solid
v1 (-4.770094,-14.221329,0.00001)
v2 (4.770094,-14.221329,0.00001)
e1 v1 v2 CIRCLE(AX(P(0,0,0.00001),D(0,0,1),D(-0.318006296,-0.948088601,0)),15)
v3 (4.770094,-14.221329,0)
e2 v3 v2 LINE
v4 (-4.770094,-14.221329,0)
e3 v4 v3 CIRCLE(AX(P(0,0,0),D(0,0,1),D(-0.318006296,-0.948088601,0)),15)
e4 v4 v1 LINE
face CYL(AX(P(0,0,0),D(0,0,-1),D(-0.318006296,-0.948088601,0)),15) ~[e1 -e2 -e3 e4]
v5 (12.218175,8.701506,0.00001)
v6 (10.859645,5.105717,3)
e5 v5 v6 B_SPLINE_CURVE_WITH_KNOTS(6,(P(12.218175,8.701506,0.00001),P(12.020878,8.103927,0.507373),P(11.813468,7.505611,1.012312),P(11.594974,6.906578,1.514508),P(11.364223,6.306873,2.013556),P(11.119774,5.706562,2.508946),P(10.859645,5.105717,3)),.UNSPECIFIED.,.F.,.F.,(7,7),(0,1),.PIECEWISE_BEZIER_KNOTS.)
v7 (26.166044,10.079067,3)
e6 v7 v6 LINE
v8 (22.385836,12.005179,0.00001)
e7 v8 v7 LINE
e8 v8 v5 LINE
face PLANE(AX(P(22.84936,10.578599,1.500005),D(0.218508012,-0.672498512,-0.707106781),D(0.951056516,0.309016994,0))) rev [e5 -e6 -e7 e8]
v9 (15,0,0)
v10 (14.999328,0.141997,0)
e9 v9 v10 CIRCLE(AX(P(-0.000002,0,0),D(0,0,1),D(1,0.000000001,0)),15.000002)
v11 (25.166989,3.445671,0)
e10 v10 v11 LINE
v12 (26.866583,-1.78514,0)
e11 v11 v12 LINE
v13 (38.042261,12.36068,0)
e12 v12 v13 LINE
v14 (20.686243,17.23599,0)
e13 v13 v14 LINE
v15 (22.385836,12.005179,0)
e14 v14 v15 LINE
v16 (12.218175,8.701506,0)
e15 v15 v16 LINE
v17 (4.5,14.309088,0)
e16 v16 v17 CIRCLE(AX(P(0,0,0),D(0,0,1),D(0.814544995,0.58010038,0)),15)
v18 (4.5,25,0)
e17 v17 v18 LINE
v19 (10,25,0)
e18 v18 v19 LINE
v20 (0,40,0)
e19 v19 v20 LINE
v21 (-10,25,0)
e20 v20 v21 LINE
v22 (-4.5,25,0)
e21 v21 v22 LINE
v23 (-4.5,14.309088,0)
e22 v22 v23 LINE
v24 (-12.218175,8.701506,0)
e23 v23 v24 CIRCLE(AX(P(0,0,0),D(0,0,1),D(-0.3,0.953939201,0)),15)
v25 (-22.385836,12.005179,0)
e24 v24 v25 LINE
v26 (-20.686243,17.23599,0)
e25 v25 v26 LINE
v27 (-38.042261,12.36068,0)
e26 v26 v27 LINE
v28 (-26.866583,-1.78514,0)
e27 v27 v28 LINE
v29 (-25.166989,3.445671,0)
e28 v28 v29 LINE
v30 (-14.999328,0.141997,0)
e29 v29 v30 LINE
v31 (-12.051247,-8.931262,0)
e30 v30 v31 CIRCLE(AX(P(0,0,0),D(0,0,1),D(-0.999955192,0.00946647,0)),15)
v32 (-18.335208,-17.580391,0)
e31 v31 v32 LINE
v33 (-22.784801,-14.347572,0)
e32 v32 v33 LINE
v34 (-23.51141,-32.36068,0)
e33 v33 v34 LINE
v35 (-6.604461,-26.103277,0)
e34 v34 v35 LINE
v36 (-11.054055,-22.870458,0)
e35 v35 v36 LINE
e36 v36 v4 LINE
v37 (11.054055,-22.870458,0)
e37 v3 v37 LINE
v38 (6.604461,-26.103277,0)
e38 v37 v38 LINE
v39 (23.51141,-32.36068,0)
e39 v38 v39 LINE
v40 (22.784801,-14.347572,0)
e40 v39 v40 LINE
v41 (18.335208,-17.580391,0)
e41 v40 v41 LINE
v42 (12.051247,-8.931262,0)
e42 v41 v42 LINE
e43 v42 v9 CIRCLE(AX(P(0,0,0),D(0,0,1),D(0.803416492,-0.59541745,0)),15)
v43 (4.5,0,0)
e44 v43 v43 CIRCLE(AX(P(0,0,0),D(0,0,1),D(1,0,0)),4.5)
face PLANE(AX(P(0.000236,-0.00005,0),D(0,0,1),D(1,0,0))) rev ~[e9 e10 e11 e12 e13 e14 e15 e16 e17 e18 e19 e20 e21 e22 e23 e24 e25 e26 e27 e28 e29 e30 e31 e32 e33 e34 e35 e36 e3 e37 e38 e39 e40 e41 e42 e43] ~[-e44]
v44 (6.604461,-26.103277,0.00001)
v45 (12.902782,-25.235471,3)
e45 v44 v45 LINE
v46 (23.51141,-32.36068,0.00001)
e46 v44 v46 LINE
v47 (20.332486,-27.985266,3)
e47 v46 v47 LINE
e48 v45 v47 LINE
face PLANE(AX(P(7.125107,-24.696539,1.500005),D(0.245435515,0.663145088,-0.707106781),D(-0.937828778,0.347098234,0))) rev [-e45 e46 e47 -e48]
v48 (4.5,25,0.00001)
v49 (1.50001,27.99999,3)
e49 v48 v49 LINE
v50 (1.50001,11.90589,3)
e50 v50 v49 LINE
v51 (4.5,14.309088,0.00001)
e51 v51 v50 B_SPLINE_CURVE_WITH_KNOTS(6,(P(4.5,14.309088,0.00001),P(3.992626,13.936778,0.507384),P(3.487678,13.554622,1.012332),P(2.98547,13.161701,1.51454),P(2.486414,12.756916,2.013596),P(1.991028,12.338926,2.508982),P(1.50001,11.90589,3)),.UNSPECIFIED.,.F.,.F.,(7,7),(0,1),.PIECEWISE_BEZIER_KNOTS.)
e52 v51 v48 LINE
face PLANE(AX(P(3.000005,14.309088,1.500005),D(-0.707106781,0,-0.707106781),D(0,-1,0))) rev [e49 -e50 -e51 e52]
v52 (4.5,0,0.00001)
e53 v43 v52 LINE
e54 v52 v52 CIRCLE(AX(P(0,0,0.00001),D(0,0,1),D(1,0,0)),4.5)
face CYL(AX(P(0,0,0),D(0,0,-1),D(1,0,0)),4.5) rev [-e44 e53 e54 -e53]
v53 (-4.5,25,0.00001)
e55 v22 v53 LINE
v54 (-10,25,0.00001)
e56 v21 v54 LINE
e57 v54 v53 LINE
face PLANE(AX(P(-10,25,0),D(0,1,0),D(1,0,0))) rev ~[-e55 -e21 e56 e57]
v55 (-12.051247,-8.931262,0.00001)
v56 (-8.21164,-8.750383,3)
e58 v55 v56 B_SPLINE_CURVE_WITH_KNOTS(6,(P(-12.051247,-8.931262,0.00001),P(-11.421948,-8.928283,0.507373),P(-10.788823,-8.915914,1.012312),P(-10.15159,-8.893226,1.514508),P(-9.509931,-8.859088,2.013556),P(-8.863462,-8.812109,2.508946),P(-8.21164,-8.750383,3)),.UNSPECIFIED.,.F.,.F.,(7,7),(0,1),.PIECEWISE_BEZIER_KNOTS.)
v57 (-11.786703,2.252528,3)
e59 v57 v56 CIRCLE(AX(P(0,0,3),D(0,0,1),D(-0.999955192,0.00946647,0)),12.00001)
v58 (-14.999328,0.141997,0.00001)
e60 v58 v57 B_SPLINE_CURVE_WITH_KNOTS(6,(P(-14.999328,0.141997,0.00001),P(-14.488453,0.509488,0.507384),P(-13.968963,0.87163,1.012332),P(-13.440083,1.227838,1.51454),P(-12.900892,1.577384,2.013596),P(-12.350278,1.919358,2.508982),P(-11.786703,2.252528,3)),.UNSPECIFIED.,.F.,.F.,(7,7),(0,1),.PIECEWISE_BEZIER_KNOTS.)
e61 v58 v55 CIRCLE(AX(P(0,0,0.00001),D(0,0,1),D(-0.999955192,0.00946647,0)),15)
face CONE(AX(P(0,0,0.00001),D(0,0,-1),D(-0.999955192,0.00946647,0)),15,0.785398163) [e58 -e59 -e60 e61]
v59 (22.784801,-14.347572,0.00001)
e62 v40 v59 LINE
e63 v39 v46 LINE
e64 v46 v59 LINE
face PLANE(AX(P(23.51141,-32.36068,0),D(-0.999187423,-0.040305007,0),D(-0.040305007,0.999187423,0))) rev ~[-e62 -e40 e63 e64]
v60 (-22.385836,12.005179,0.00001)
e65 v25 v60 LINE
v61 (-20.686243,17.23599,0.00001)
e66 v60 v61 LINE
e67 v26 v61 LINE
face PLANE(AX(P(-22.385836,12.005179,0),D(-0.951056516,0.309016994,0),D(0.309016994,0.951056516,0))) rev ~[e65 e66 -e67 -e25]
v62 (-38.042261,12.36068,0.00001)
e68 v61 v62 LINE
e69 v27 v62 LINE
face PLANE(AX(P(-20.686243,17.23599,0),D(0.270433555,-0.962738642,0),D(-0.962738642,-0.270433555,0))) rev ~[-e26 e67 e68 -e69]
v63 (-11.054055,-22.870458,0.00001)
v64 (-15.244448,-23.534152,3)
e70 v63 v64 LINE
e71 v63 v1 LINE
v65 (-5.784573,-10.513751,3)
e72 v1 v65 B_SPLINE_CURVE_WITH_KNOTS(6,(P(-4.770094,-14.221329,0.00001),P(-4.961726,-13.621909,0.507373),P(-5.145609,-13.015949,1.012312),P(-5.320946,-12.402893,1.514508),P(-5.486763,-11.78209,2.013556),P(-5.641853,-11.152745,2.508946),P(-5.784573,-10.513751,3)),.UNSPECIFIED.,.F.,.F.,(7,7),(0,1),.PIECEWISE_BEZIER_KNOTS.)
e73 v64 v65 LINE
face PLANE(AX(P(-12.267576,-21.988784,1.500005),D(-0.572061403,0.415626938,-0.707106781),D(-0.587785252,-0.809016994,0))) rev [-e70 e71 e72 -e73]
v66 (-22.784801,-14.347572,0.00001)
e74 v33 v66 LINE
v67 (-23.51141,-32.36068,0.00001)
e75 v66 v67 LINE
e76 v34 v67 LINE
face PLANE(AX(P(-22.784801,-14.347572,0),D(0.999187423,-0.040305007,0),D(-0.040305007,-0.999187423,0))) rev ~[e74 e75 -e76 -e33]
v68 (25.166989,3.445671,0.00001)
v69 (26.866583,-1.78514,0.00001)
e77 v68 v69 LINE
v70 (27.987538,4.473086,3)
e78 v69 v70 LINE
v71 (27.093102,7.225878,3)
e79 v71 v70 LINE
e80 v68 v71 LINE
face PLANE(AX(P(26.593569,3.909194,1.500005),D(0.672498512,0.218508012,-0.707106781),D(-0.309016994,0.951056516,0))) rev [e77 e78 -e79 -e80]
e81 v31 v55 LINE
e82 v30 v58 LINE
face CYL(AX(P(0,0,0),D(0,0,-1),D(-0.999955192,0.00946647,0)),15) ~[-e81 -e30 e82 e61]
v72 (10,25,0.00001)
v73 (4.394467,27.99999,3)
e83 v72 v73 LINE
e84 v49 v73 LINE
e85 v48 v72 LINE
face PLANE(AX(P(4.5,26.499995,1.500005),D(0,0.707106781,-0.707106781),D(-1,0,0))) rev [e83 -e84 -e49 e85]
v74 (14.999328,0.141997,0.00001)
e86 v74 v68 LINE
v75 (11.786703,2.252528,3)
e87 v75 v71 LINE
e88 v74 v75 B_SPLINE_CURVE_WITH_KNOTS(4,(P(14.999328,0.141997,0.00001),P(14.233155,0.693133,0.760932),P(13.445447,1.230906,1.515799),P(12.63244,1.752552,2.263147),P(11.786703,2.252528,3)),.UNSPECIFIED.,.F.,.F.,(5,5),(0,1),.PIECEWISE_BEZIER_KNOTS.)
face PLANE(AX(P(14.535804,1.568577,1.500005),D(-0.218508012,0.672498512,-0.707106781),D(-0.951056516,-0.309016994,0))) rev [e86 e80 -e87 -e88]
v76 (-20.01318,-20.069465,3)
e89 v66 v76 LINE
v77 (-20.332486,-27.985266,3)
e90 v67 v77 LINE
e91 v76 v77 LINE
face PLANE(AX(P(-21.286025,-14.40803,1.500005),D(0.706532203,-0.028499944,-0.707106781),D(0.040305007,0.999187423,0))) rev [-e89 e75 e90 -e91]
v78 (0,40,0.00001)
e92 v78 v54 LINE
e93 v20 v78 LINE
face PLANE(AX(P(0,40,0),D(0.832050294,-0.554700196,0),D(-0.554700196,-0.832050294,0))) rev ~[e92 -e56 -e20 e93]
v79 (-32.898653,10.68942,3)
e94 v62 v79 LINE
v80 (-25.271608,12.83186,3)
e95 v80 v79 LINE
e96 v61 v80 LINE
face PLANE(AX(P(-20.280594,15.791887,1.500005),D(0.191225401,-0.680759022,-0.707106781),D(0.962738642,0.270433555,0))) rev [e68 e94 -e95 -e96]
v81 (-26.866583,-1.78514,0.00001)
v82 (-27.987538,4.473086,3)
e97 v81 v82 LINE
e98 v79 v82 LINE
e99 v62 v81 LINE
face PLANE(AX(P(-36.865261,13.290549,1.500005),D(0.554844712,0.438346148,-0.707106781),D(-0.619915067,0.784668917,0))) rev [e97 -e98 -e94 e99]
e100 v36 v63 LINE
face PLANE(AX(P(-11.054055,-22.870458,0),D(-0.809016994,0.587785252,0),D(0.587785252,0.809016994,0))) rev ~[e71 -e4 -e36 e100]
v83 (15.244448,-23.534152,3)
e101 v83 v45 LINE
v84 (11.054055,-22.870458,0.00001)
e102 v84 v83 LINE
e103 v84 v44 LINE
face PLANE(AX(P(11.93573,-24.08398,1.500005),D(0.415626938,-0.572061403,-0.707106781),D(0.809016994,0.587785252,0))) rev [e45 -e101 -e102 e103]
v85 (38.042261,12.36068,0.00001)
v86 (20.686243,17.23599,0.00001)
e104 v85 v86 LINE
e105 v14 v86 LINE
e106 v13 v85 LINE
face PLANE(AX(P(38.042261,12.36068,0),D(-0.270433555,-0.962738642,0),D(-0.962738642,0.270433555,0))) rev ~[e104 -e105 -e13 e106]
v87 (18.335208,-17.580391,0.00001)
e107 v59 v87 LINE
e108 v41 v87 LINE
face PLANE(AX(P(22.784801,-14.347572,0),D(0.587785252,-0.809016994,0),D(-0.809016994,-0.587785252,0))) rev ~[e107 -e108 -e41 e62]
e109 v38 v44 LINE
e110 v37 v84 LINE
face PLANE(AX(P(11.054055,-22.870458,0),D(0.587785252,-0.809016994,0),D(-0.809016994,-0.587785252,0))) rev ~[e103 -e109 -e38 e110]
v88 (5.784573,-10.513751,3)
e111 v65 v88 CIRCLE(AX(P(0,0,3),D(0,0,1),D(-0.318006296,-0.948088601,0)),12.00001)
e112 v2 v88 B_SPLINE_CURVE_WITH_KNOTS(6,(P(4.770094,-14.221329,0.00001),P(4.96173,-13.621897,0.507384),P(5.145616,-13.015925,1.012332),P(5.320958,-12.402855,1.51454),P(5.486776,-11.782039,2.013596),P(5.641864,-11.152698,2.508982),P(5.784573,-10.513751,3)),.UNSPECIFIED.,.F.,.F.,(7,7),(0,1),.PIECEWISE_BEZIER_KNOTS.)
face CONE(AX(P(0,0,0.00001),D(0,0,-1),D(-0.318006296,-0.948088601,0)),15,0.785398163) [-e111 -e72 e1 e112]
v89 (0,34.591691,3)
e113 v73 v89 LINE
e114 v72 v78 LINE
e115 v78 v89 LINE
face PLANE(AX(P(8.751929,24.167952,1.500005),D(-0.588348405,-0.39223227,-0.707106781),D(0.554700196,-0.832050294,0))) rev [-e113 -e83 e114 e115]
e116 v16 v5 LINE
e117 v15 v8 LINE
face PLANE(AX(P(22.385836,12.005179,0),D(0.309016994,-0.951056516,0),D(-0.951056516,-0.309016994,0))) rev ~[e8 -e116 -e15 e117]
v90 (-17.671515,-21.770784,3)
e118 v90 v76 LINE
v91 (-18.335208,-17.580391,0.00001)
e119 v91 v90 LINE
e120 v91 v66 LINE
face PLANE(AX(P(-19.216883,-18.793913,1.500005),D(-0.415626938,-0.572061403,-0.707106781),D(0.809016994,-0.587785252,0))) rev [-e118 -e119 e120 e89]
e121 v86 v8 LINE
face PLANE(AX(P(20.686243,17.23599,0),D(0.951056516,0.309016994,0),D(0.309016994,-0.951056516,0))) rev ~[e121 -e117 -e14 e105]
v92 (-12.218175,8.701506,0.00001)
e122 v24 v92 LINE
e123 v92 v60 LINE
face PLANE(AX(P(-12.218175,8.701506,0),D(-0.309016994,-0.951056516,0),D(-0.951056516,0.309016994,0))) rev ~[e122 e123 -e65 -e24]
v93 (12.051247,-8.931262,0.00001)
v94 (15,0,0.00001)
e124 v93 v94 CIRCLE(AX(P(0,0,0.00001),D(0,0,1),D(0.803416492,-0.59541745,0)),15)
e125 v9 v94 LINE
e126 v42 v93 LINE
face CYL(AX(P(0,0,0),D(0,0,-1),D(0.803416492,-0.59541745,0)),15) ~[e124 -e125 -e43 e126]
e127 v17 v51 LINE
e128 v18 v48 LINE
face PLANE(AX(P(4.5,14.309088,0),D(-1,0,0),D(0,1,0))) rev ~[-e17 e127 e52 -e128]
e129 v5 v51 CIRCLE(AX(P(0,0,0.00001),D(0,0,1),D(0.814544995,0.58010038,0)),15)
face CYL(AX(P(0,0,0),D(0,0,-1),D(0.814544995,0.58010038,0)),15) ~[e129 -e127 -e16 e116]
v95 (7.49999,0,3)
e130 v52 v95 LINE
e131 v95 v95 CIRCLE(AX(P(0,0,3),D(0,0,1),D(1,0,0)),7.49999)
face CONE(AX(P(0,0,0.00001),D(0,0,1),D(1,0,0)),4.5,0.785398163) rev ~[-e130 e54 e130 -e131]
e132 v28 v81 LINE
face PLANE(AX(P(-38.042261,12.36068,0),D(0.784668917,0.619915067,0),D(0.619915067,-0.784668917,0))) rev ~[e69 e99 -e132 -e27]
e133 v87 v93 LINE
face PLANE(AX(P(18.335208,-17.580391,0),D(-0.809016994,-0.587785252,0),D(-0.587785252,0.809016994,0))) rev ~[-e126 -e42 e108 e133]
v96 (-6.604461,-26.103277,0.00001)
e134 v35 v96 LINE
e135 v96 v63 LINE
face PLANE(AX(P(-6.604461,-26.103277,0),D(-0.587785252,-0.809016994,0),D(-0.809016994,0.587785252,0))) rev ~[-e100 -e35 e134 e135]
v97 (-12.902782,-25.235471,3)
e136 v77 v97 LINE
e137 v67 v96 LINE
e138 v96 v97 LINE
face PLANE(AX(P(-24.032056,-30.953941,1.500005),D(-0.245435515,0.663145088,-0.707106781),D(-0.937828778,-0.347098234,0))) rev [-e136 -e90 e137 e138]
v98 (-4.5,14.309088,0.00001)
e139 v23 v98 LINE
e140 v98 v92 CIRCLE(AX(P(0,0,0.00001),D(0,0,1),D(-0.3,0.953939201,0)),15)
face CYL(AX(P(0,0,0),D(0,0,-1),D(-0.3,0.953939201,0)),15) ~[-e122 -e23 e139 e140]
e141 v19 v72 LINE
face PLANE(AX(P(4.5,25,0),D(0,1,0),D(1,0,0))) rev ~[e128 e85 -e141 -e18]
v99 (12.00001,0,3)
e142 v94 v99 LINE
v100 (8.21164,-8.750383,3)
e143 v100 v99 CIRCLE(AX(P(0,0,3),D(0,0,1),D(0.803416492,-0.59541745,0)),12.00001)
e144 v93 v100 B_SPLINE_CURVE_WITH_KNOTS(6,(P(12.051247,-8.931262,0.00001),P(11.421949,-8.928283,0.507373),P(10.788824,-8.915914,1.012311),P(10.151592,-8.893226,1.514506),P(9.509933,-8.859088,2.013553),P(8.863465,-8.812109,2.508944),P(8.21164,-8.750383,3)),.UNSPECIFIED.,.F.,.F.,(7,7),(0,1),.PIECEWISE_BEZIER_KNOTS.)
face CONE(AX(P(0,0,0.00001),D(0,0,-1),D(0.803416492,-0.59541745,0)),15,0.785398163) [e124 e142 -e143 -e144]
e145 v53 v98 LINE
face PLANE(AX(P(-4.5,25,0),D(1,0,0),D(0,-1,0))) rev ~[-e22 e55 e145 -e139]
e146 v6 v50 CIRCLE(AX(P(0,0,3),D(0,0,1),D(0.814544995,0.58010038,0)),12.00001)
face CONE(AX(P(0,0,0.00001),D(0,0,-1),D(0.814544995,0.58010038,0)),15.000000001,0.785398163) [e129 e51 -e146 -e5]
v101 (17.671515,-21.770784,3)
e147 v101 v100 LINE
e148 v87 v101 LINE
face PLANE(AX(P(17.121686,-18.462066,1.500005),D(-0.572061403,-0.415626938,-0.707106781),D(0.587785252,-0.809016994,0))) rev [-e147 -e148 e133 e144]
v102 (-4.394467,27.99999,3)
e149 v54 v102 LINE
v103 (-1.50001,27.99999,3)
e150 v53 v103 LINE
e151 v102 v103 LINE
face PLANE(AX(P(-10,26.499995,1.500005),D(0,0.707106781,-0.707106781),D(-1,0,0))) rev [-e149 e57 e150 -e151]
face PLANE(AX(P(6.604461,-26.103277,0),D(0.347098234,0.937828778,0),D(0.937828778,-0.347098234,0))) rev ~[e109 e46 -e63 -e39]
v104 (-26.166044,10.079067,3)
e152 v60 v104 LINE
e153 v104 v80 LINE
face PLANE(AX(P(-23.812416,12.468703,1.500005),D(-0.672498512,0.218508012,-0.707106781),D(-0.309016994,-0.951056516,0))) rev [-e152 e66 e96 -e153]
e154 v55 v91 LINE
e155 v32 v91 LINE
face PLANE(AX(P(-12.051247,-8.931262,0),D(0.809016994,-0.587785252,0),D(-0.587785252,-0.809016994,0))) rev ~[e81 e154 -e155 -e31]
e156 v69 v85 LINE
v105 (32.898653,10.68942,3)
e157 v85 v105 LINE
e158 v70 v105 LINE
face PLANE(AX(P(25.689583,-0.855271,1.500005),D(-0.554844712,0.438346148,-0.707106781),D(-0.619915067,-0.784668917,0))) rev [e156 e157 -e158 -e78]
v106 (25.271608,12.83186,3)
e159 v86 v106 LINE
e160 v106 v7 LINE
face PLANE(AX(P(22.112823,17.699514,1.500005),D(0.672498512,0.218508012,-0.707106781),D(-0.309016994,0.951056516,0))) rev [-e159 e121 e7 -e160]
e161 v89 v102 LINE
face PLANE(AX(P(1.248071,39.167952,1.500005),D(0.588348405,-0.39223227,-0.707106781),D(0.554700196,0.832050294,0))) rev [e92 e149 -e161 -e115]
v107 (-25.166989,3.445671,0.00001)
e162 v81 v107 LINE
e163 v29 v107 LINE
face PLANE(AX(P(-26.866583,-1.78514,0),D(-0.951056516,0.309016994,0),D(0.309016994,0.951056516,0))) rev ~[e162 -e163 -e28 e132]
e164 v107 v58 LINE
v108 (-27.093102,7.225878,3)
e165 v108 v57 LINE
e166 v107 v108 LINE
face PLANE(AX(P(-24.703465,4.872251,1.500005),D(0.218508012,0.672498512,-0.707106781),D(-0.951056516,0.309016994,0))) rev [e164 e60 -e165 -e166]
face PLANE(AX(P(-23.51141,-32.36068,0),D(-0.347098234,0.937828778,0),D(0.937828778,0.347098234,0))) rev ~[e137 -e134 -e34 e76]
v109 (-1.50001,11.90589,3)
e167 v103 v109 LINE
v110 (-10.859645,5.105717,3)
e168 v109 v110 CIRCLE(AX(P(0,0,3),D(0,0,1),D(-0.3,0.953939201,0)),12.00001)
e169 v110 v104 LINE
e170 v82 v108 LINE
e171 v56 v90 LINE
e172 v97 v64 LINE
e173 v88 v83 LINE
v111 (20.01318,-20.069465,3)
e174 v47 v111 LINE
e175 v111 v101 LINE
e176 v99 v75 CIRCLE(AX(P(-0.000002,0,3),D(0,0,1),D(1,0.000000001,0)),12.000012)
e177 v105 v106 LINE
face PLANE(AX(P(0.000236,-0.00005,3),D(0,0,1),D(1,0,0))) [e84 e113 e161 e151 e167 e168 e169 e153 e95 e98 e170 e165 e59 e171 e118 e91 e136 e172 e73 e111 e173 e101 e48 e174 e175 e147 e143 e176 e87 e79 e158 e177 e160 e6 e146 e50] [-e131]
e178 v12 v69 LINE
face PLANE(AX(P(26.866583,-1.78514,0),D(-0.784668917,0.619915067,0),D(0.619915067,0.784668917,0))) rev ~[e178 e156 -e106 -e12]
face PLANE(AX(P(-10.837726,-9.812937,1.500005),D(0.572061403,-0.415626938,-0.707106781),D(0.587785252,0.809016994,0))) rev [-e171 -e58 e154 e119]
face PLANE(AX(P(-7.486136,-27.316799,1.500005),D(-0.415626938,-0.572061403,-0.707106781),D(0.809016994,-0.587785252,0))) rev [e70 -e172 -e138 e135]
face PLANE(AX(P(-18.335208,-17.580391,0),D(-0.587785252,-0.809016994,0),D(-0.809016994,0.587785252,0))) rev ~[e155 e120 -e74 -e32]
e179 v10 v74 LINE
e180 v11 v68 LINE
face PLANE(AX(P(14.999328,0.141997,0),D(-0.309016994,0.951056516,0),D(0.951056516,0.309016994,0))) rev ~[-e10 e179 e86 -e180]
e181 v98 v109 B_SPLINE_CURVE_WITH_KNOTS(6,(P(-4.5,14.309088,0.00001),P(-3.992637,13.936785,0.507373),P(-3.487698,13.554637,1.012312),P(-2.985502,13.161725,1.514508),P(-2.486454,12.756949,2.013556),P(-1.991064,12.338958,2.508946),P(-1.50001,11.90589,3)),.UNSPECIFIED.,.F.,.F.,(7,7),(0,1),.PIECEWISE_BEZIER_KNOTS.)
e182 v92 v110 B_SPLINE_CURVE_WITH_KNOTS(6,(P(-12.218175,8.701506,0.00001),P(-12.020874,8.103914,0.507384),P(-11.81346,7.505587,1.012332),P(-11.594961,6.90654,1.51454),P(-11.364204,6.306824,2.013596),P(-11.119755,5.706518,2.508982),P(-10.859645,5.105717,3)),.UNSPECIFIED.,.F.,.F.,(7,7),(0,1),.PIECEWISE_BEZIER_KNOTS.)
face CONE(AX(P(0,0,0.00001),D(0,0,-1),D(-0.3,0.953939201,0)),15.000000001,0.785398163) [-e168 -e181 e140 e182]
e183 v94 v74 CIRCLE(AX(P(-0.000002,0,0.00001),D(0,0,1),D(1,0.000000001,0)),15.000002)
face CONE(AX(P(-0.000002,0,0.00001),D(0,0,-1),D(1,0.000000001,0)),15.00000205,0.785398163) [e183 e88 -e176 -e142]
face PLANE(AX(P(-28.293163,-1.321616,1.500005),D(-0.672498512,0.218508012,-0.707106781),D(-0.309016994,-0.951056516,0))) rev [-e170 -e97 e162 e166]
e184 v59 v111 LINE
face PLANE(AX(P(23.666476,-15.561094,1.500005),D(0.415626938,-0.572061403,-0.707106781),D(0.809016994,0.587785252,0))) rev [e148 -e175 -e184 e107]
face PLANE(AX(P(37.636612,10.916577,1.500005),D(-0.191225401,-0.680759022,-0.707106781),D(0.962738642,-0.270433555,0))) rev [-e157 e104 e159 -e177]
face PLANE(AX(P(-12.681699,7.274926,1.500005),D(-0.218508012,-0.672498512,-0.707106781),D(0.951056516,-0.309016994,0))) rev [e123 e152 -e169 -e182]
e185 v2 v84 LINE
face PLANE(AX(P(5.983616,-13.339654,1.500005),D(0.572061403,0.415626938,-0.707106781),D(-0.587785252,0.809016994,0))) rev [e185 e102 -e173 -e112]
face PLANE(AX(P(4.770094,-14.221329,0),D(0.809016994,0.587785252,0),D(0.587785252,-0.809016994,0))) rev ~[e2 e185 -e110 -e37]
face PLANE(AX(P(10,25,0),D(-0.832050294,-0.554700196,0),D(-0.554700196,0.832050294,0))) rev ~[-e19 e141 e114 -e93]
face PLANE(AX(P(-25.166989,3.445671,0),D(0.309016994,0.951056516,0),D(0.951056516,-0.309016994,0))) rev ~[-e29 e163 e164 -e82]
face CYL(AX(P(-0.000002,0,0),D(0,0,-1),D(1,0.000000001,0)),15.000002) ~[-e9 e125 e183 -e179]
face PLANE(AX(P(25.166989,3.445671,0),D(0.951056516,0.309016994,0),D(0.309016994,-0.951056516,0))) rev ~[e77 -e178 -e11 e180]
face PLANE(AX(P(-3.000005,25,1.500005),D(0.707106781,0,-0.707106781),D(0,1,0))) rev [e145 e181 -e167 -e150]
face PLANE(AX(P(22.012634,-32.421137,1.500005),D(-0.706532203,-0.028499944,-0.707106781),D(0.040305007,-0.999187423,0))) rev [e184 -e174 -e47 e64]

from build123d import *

# Parameters (mm, degrees)
F0_R     = 4.5
F1_DEPTH = 3
F2_SIZE2 = 2.99999
F2_SIZE  = 2.99999


# Not quite as in the source:
# - a fillet or chamfer is up to 0.001 mm smaller than in the source, because OpenCascade refuses the exact size


with BuildPart() as f1:
    # F0 (on Top) → F1 (new body)
    with BuildSketch(Plane.XY):
        with BuildLine():
            ThreePointArc((12.0512473873, -8.9312617479), (14.2437479409, -4.7027273571), (15, 0))
            ThreePointArc((15, 0), (14.9998319689, 0.07099932), (14.9993278795, 0.1419970492))
            Line((14.9993278795, 0.1419970492), (9.794719653, -1.5490826747))
            Line((9.794719653, -1.5490826747), (7.0135667036, 7.0104259719))
            Line((7.0135667036, 7.0104259719), (12.2181749302, 8.7015056959))
            ThreePointArc((12.2181749302, 8.7015056959), (8.8167787844, 12.1352549156), (4.5, 14.3090880213))
            Line((4.5, 14.3090880213), (4.5, 8.8366390791))
            Line((4.5, 8.8366390791), (-4.5, 8.8366390791))
            Line((-4.5, 8.8366390791), (-4.5, 14.3090880213))
            ThreePointArc((-4.5, 14.3090880213), (-8.8167787844, 12.1352549156), (-12.2181749302, 8.7015056959))
            Line((-12.2181749302, 8.7015056959), (-7.0135667036, 7.0104259719))
            Line((-7.0135667036, 7.0104259719), (-9.794719653, -1.5490826747))
            Line((-9.794719653, -1.5490826747), (-14.9993278795, 0.1419970492))
            ThreePointArc((-14.9993278795, 0.1419970492), (-14.2658477444, -4.6352549156), (-12.0512473873, -8.9312617479))
            Line((-12.0512473873, -8.9312617479), (-8.8346226052, -4.5039575528))
            Line((-8.8346226052, -4.5039575528), (-1.5534696558, -9.7940248235))
            Line((-1.5534696558, -9.7940248235), (-4.770094438, -14.2213290185))
            ThreePointArc((-4.770094438, -14.2213290185), (0, -15), (4.770094438, -14.2213290185))
            Line((4.770094438, -14.2213290185), (1.5534696558, -9.7940248235))
            Line((1.5534696558, -9.7940248235), (8.8346226052, -4.5039575528))
            Line((8.8346226052, -4.5039575528), (12.0512473873, -8.9312617479))
        make_face()
        Circle(F0_R, mode=Mode.SUBTRACT)
        with BuildLine():
            Line((9.794719653, -1.5490826747), (14.9993278795, 0.1419970492))
            ThreePointArc((14.9993278795, 0.1419970492), (14.2658477444, 4.6352549156), (12.2181749302, 8.7015056959))
            Line((12.2181749302, 8.7015056959), (7.0135667036, 7.0104259719))
            Line((7.0135667036, 7.0104259719), (9.794719653, -1.5490826747))
        make_face()
        with BuildLine():
            ThreePointArc((12.2181749302, 8.7015056959), (14.2658477444, 4.6352549156), (14.9993278795, 0.1419970492))
            Line((14.9993278795, 0.1419970492), (25.1669893821, 3.445670536))
            Line((25.1669893821, 3.445670536), (22.3858364327, 12.0051791827))
            Line((22.3858364327, 12.0051791827), (12.2181749302, 8.7015056959))
        make_face()
        with BuildLine():
            Line((18.335207782, -17.5803912241), (12.0512473873, -8.9312617479))
            ThreePointArc((12.0512473873, -8.9312617479), (8.8167787844, -12.1352549156), (4.770094438, -14.2213290185))
            Line((4.770094438, -14.2213290185), (11.0540548326, -22.8704584947))
            Line((11.0540548326, -22.8704584947), (18.335207782, -17.5803912241))
        make_face()
        with BuildLine():
            ThreePointArc((4.770094438, -14.2213290185), (8.8167787844, -12.1352549156), (12.0512473873, -8.9312617479))
            Line((12.0512473873, -8.9312617479), (8.8346226052, -4.5039575528))
            Line((8.8346226052, -4.5039575528), (1.5534696558, -9.7940248235))
            Line((1.5534696558, -9.7940248235), (4.770094438, -14.2213290185))
        make_face()
        Polygon((22.3858364327, 12.0051791827), (25.1669893821, 3.445670536), (26.8665828511, -1.7851403036), (38.0422606518, 12.360679775), (20.6862429636, 17.2359900223), align=None)
        Polygon((22.7848012511, -14.3475723364), (18.335207782, -17.5803912241), (11.0540548326, -22.8704584947), (6.6044613636, -26.1032773823), (23.5114100917, -32.360679775), align=None)
        with BuildLine():
            Line((4.5, 8.8366390791), (4.5, 14.3090880213))
            ThreePointArc((4.5, 14.3090880213), (0, 15), (-4.5, 14.3090880213))
            Line((-4.5, 14.3090880213), (-4.5, 8.8366390791))
            Line((-4.5, 8.8366390791), (4.5, 8.8366390791))
        make_face()
        with BuildLine():
            ThreePointArc((-4.5, 14.3090880213), (0, 15), (4.5, 14.3090880213))
            Line((4.5, 14.3090880213), (4.5, 25))
            Line((4.5, 25), (-4.5, 25))
            Line((-4.5, 25), (-4.5, 14.3090880213))
        make_face()
        with BuildLine():
            Line((-11.0540548326, -22.8704584947), (-4.770094438, -14.2213290185))
            ThreePointArc((-4.770094438, -14.2213290185), (-8.8167787844, -12.1352549156), (-12.0512473873, -8.9312617479))
            Line((-12.0512473873, -8.9312617479), (-18.335207782, -17.5803912241))
            Line((-18.335207782, -17.5803912241), (-11.0540548326, -22.8704584947))
        make_face()
        with BuildLine():
            ThreePointArc((-12.0512473873, -8.9312617479), (-8.8167787844, -12.1352549156), (-4.770094438, -14.2213290185))
            Line((-4.770094438, -14.2213290185), (-1.5534696558, -9.7940248235))
            Line((-1.5534696558, -9.7940248235), (-8.8346226052, -4.5039575528))
            Line((-8.8346226052, -4.5039575528), (-12.0512473873, -8.9312617479))
        make_face()
        Polygon((-4.5, 25), (4.5, 25), (10, 25), (0, 40), (-10, 25), align=None)
        Polygon((-6.6044613636, -26.1032773823), (-11.0540548326, -22.8704584947), (-18.335207782, -17.5803912241), (-22.7848012511, -14.3475723364), (-23.5114100917, -32.360679775), align=None)
        with BuildLine():
            Line((-7.0135667036, 7.0104259719), (-12.2181749302, 8.7015056959))
            ThreePointArc((-12.2181749302, 8.7015056959), (-14.2658477444, 4.6352549156), (-14.9993278795, 0.1419970492))
            Line((-14.9993278795, 0.1419970492), (-9.794719653, -1.5490826747))
            Line((-9.794719653, -1.5490826747), (-7.0135667036, 7.0104259719))
        make_face()
        with BuildLine():
            ThreePointArc((-14.9993278795, 0.1419970492), (-14.2658477444, 4.6352549156), (-12.2181749302, 8.7015056959))
            Line((-12.2181749302, 8.7015056959), (-22.3858364327, 12.0051791827))
            Line((-22.3858364327, 12.0051791827), (-25.1669893821, 3.445670536))
            Line((-25.1669893821, 3.445670536), (-14.9993278795, 0.1419970492))
        make_face()
        Polygon((-25.1669893821, 3.445670536), (-22.3858364327, 12.0051791827), (-20.6862429636, 17.2359900223), (-38.0422606518, 12.360679775), (-26.8665828511, -1.7851403036), align=None)
    extrude(amount=F1_DEPTH)

    # F2 (size 3 and 3 in the source; OpenCascade refuses exactly that, so slightly less here)
    f2_edges = [f1.edges().sort_by_distance(p)[0] for p in [
        (-15.193228, -13.255826, 3),
        (-20.560005, -15.963982, 3),
        (-23.148106, -23.354126, 3),
        (-15.057936, -29.231979, 3),
        (-8.829258, -24.486868, 3),
        (-7.912075, -18.545894, 3),
        (0, -15, 3),
        (7.912075, -18.545894, 3),
        (8.829258, -24.486868, 3),
        (15.057936, -29.231979, 3),
        (23.148106, -23.354126, 3),
        (20.560005, -15.963982, 3),
        (15.193228, -13.255826, 3),
        (14.265848, -4.635255, 3),
        (20.083159, 1.793834, 3),
        (26.016786, 0.830265, 3),
        (32.454422, 5.28777, 3),
        (29.364252, 14.798335, 3),
        (21.53604, 14.620585, 3),
        (17.302006, 10.353342, 3),
        (8.816779, 12.135255, 3),
        (4.5, 19.654544, 3),
        (7.25, 25, 3),
        (5, 32.5, 3),
        (-5, 32.5, 3),
        (-7.25, 25, 3),
        (-4.5, 19.654544, 3),
        (-8.816779, 12.135255, 3),
        (-17.302006, 10.353342, 3),
        (-21.53604, 14.620585, 3),
        (-29.364252, 14.798335, 3),
        (-32.454422, 5.28777, 3),
        (-26.016786, 0.830265, 3),
        (-20.083159, 1.793834, 3),
        (-14.265848, -4.635255, 3),
        (-4.5, 0, 3),
    ]]
    chamfer(f2_edges, length=F2_SIZE, length2=F2_SIZE2)


solid = f1.part
